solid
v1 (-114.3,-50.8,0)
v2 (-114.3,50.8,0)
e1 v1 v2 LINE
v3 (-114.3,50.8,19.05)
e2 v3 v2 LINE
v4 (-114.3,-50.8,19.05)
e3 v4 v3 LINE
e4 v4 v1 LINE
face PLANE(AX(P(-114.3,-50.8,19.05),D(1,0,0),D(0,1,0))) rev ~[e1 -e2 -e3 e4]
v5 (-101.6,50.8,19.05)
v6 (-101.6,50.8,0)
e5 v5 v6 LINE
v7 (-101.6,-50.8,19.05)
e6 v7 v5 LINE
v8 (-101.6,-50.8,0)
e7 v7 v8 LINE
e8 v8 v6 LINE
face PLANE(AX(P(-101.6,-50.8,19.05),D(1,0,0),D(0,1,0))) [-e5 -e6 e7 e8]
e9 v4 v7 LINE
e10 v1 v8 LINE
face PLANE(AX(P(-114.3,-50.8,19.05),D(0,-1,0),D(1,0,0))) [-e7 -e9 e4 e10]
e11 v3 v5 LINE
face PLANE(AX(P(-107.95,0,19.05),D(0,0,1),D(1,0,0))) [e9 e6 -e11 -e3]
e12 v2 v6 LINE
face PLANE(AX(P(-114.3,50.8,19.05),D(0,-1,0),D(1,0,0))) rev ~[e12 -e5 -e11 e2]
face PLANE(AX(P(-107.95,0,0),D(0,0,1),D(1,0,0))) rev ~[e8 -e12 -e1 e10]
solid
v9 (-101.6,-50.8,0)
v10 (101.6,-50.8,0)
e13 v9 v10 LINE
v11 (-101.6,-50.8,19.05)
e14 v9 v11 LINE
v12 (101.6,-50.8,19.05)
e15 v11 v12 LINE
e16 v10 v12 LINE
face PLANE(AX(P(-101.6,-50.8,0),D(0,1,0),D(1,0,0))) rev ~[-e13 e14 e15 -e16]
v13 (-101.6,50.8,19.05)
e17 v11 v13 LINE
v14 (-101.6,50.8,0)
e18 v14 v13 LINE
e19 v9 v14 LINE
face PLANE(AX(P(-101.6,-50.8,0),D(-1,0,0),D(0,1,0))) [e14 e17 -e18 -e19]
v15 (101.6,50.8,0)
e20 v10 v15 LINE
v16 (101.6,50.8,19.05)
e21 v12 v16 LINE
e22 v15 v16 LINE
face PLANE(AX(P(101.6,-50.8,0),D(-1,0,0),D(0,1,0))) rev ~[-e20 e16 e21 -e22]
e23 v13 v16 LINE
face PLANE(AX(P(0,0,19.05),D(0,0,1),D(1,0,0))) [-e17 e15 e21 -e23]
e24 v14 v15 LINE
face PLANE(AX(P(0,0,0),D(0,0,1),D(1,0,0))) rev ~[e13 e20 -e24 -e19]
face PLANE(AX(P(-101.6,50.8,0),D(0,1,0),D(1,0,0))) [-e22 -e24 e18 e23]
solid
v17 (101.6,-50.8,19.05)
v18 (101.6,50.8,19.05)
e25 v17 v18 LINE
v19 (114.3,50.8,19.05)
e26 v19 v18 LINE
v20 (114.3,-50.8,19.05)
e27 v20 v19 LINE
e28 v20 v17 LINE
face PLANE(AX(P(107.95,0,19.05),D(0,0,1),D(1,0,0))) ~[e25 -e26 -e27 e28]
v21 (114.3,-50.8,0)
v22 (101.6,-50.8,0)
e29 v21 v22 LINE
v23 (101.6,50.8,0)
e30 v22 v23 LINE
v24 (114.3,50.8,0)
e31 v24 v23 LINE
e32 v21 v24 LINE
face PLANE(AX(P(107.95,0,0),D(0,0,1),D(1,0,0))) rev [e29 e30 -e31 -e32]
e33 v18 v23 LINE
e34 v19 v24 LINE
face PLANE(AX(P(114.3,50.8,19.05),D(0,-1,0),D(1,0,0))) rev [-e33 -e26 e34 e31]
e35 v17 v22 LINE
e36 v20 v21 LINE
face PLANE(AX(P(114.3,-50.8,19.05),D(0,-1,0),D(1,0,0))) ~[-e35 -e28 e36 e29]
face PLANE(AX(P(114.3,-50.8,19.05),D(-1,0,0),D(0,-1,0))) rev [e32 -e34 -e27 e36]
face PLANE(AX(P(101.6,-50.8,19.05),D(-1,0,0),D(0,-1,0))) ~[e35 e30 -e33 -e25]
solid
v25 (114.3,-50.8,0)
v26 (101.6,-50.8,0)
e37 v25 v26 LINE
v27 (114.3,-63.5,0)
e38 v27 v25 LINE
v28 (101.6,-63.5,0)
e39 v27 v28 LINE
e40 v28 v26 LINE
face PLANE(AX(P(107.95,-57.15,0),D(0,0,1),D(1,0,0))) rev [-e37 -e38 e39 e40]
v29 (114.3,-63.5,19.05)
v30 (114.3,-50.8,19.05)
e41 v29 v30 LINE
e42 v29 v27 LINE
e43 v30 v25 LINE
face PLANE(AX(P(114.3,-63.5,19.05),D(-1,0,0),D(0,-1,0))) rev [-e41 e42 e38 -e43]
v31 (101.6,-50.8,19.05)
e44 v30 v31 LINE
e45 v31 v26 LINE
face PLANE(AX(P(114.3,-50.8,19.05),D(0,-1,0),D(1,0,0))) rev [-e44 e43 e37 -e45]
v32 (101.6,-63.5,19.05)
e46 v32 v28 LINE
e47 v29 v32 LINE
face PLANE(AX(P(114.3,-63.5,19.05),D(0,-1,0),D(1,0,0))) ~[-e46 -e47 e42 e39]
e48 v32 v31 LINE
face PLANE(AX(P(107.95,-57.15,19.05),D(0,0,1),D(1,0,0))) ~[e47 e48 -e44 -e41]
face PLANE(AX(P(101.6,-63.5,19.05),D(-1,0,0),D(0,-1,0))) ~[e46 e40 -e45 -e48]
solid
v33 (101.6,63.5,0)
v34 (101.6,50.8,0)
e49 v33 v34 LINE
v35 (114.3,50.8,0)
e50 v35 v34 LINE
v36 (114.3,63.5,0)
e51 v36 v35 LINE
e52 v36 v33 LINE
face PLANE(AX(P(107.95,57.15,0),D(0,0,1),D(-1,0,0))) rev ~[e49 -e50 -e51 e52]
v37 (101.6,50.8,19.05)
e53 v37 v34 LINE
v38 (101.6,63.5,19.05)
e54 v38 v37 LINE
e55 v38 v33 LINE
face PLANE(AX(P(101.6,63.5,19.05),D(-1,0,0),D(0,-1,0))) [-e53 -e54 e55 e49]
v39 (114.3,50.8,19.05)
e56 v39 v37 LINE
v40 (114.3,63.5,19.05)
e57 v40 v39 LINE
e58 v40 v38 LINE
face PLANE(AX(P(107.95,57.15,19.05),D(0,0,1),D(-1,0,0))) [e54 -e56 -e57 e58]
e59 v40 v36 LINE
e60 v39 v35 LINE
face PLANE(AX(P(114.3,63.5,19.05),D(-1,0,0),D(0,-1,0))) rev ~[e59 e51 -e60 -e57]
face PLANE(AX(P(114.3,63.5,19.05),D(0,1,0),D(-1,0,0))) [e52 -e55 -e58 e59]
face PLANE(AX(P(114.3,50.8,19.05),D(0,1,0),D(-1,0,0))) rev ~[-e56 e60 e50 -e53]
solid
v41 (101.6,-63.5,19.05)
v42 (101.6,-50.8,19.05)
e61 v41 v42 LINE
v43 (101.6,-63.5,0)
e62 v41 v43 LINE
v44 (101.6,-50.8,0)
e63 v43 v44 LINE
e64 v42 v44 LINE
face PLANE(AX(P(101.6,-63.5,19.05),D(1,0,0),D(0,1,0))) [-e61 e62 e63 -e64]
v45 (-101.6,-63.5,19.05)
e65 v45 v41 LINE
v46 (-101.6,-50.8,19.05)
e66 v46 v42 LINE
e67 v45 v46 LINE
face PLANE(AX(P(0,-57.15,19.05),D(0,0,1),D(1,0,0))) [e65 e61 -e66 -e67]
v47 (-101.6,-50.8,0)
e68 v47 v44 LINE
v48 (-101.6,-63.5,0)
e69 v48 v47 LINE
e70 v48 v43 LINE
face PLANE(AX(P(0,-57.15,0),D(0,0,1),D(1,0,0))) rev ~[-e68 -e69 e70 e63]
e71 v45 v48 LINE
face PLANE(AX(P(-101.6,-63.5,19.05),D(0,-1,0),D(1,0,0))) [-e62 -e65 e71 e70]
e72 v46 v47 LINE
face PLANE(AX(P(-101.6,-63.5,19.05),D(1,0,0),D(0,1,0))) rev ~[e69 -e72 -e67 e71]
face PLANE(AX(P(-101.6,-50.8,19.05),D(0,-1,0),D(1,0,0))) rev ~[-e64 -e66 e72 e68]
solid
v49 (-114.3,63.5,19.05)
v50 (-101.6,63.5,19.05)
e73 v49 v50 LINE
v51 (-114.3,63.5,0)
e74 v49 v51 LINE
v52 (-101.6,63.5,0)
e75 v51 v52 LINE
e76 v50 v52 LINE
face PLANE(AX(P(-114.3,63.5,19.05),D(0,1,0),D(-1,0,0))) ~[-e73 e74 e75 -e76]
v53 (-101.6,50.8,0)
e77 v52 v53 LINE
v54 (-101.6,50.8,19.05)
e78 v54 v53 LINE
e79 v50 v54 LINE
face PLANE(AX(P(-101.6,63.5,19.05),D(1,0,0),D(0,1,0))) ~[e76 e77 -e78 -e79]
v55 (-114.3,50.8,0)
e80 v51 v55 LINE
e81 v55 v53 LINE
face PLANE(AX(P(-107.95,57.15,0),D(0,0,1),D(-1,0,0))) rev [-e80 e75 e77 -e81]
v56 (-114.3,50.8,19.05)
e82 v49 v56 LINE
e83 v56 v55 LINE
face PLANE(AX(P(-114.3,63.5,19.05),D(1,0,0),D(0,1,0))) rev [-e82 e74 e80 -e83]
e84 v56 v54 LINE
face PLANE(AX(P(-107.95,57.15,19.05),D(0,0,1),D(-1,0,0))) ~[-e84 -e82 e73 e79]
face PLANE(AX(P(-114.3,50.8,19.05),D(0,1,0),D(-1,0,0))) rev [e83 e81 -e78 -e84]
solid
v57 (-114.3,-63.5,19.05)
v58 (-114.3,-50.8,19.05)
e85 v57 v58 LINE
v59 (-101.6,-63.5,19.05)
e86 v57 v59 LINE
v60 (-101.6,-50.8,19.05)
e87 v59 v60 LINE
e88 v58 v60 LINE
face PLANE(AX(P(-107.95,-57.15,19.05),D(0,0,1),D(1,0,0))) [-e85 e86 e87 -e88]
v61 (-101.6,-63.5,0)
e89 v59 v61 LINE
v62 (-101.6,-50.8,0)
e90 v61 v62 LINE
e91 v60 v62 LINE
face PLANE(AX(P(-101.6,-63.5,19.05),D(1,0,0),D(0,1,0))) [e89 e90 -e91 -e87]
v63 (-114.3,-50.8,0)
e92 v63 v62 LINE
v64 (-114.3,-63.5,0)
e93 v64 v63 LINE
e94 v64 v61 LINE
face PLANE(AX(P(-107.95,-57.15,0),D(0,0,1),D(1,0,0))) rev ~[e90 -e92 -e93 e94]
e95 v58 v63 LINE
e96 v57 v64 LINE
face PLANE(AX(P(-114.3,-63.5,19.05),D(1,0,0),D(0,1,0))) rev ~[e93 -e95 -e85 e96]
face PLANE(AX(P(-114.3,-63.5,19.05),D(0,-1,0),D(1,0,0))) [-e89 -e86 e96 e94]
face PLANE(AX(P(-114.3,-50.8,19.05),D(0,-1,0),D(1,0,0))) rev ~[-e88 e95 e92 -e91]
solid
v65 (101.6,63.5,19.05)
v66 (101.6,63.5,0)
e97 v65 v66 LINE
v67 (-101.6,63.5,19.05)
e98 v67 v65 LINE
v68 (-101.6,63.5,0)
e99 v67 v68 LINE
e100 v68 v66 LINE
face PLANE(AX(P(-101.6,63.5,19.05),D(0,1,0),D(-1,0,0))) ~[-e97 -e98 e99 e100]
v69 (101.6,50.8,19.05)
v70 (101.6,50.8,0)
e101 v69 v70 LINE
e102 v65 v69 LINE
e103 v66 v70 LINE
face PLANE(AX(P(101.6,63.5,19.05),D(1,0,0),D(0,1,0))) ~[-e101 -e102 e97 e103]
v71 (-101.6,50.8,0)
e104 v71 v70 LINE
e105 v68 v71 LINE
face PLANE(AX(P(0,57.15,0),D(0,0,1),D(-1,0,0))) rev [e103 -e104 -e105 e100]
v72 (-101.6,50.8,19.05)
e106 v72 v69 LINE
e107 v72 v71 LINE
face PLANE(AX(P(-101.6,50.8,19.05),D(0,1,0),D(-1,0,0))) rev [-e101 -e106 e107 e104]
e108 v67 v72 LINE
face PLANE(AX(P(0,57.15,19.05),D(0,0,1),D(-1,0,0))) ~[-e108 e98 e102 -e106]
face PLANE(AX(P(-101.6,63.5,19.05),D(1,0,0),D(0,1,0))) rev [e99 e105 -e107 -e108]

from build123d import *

# Parameters (mm, degrees)
F0_W      = 203.2
F0_H      = 101.6
F1_DEPTH  = 19.05
F2_W      = 12.7
F2_H      = 12.7
F3_DEPTH  = 19.05
F6_W      = 203.2
F6_H      = 12.7
F7_DEPTH  = 19.05
F9_W      = 12.7
F9_H      = 101.6
F10_DEPTH = 19.05


# Not quite as in the source:
# - a length typed as a fraction of an inch, garbled in the dataset ("3 / 203.2 mm" for 3/8 in), is restored


with BuildPart() as f1:
    # F0 (on Top) → F1 (new body)
    with BuildSketch(Plane.XY):
        Rectangle(F0_W, F0_H)
    extrude(amount=F1_DEPTH)


with BuildPart() as f3:
    # F2 (on face) → F3 (new body)
    with BuildSketch(Plane.XY.offset(19.05)):
        with Locations((-107.95, -57.15)):
            Rectangle(F2_W, F2_H)
    extrude(amount=-F3_DEPTH)


with BuildPart() as f4_1:
    # F4: instance of F3
    add(f3.part.mirror(Plane.YZ))


with BuildPart() as f5_1:
    # F5: instance of F3
    add(f3.part.mirror(Plane.XZ))


with BuildPart() as f5_2:
    # F5: instance of F4_1
    add(f4_1.part.mirror(Plane.XZ))


with BuildPart() as f7:
    # F6 (on face) → F7 (new body)
    with BuildSketch(Plane.XY.offset(19.05)):
        with Locations((0, -57.15)):
            Rectangle(F6_W, F6_H)
    extrude(amount=-F7_DEPTH)


with BuildPart() as f8_1:
    # F8: instance of F7
    add(f7.part.mirror(Plane.XZ))


with BuildPart() as f10:
    # F9 (on face) → F10 (new body)
    with BuildSketch(Plane.XY.offset(19.05)):
        with Locations((-107.95, 0)):
            Rectangle(F9_W, F9_H)
    extrude(amount=-F10_DEPTH)


with BuildPart() as f11_1:
    # F11: instance of F10
    add(f10.part.mirror(Plane.YZ))


solid = Compound([f1.part, f3.part, f4_1.part, f5_1.part, f5_2.part, f7.part, f8_1.part, f10.part, f11_1.part])
